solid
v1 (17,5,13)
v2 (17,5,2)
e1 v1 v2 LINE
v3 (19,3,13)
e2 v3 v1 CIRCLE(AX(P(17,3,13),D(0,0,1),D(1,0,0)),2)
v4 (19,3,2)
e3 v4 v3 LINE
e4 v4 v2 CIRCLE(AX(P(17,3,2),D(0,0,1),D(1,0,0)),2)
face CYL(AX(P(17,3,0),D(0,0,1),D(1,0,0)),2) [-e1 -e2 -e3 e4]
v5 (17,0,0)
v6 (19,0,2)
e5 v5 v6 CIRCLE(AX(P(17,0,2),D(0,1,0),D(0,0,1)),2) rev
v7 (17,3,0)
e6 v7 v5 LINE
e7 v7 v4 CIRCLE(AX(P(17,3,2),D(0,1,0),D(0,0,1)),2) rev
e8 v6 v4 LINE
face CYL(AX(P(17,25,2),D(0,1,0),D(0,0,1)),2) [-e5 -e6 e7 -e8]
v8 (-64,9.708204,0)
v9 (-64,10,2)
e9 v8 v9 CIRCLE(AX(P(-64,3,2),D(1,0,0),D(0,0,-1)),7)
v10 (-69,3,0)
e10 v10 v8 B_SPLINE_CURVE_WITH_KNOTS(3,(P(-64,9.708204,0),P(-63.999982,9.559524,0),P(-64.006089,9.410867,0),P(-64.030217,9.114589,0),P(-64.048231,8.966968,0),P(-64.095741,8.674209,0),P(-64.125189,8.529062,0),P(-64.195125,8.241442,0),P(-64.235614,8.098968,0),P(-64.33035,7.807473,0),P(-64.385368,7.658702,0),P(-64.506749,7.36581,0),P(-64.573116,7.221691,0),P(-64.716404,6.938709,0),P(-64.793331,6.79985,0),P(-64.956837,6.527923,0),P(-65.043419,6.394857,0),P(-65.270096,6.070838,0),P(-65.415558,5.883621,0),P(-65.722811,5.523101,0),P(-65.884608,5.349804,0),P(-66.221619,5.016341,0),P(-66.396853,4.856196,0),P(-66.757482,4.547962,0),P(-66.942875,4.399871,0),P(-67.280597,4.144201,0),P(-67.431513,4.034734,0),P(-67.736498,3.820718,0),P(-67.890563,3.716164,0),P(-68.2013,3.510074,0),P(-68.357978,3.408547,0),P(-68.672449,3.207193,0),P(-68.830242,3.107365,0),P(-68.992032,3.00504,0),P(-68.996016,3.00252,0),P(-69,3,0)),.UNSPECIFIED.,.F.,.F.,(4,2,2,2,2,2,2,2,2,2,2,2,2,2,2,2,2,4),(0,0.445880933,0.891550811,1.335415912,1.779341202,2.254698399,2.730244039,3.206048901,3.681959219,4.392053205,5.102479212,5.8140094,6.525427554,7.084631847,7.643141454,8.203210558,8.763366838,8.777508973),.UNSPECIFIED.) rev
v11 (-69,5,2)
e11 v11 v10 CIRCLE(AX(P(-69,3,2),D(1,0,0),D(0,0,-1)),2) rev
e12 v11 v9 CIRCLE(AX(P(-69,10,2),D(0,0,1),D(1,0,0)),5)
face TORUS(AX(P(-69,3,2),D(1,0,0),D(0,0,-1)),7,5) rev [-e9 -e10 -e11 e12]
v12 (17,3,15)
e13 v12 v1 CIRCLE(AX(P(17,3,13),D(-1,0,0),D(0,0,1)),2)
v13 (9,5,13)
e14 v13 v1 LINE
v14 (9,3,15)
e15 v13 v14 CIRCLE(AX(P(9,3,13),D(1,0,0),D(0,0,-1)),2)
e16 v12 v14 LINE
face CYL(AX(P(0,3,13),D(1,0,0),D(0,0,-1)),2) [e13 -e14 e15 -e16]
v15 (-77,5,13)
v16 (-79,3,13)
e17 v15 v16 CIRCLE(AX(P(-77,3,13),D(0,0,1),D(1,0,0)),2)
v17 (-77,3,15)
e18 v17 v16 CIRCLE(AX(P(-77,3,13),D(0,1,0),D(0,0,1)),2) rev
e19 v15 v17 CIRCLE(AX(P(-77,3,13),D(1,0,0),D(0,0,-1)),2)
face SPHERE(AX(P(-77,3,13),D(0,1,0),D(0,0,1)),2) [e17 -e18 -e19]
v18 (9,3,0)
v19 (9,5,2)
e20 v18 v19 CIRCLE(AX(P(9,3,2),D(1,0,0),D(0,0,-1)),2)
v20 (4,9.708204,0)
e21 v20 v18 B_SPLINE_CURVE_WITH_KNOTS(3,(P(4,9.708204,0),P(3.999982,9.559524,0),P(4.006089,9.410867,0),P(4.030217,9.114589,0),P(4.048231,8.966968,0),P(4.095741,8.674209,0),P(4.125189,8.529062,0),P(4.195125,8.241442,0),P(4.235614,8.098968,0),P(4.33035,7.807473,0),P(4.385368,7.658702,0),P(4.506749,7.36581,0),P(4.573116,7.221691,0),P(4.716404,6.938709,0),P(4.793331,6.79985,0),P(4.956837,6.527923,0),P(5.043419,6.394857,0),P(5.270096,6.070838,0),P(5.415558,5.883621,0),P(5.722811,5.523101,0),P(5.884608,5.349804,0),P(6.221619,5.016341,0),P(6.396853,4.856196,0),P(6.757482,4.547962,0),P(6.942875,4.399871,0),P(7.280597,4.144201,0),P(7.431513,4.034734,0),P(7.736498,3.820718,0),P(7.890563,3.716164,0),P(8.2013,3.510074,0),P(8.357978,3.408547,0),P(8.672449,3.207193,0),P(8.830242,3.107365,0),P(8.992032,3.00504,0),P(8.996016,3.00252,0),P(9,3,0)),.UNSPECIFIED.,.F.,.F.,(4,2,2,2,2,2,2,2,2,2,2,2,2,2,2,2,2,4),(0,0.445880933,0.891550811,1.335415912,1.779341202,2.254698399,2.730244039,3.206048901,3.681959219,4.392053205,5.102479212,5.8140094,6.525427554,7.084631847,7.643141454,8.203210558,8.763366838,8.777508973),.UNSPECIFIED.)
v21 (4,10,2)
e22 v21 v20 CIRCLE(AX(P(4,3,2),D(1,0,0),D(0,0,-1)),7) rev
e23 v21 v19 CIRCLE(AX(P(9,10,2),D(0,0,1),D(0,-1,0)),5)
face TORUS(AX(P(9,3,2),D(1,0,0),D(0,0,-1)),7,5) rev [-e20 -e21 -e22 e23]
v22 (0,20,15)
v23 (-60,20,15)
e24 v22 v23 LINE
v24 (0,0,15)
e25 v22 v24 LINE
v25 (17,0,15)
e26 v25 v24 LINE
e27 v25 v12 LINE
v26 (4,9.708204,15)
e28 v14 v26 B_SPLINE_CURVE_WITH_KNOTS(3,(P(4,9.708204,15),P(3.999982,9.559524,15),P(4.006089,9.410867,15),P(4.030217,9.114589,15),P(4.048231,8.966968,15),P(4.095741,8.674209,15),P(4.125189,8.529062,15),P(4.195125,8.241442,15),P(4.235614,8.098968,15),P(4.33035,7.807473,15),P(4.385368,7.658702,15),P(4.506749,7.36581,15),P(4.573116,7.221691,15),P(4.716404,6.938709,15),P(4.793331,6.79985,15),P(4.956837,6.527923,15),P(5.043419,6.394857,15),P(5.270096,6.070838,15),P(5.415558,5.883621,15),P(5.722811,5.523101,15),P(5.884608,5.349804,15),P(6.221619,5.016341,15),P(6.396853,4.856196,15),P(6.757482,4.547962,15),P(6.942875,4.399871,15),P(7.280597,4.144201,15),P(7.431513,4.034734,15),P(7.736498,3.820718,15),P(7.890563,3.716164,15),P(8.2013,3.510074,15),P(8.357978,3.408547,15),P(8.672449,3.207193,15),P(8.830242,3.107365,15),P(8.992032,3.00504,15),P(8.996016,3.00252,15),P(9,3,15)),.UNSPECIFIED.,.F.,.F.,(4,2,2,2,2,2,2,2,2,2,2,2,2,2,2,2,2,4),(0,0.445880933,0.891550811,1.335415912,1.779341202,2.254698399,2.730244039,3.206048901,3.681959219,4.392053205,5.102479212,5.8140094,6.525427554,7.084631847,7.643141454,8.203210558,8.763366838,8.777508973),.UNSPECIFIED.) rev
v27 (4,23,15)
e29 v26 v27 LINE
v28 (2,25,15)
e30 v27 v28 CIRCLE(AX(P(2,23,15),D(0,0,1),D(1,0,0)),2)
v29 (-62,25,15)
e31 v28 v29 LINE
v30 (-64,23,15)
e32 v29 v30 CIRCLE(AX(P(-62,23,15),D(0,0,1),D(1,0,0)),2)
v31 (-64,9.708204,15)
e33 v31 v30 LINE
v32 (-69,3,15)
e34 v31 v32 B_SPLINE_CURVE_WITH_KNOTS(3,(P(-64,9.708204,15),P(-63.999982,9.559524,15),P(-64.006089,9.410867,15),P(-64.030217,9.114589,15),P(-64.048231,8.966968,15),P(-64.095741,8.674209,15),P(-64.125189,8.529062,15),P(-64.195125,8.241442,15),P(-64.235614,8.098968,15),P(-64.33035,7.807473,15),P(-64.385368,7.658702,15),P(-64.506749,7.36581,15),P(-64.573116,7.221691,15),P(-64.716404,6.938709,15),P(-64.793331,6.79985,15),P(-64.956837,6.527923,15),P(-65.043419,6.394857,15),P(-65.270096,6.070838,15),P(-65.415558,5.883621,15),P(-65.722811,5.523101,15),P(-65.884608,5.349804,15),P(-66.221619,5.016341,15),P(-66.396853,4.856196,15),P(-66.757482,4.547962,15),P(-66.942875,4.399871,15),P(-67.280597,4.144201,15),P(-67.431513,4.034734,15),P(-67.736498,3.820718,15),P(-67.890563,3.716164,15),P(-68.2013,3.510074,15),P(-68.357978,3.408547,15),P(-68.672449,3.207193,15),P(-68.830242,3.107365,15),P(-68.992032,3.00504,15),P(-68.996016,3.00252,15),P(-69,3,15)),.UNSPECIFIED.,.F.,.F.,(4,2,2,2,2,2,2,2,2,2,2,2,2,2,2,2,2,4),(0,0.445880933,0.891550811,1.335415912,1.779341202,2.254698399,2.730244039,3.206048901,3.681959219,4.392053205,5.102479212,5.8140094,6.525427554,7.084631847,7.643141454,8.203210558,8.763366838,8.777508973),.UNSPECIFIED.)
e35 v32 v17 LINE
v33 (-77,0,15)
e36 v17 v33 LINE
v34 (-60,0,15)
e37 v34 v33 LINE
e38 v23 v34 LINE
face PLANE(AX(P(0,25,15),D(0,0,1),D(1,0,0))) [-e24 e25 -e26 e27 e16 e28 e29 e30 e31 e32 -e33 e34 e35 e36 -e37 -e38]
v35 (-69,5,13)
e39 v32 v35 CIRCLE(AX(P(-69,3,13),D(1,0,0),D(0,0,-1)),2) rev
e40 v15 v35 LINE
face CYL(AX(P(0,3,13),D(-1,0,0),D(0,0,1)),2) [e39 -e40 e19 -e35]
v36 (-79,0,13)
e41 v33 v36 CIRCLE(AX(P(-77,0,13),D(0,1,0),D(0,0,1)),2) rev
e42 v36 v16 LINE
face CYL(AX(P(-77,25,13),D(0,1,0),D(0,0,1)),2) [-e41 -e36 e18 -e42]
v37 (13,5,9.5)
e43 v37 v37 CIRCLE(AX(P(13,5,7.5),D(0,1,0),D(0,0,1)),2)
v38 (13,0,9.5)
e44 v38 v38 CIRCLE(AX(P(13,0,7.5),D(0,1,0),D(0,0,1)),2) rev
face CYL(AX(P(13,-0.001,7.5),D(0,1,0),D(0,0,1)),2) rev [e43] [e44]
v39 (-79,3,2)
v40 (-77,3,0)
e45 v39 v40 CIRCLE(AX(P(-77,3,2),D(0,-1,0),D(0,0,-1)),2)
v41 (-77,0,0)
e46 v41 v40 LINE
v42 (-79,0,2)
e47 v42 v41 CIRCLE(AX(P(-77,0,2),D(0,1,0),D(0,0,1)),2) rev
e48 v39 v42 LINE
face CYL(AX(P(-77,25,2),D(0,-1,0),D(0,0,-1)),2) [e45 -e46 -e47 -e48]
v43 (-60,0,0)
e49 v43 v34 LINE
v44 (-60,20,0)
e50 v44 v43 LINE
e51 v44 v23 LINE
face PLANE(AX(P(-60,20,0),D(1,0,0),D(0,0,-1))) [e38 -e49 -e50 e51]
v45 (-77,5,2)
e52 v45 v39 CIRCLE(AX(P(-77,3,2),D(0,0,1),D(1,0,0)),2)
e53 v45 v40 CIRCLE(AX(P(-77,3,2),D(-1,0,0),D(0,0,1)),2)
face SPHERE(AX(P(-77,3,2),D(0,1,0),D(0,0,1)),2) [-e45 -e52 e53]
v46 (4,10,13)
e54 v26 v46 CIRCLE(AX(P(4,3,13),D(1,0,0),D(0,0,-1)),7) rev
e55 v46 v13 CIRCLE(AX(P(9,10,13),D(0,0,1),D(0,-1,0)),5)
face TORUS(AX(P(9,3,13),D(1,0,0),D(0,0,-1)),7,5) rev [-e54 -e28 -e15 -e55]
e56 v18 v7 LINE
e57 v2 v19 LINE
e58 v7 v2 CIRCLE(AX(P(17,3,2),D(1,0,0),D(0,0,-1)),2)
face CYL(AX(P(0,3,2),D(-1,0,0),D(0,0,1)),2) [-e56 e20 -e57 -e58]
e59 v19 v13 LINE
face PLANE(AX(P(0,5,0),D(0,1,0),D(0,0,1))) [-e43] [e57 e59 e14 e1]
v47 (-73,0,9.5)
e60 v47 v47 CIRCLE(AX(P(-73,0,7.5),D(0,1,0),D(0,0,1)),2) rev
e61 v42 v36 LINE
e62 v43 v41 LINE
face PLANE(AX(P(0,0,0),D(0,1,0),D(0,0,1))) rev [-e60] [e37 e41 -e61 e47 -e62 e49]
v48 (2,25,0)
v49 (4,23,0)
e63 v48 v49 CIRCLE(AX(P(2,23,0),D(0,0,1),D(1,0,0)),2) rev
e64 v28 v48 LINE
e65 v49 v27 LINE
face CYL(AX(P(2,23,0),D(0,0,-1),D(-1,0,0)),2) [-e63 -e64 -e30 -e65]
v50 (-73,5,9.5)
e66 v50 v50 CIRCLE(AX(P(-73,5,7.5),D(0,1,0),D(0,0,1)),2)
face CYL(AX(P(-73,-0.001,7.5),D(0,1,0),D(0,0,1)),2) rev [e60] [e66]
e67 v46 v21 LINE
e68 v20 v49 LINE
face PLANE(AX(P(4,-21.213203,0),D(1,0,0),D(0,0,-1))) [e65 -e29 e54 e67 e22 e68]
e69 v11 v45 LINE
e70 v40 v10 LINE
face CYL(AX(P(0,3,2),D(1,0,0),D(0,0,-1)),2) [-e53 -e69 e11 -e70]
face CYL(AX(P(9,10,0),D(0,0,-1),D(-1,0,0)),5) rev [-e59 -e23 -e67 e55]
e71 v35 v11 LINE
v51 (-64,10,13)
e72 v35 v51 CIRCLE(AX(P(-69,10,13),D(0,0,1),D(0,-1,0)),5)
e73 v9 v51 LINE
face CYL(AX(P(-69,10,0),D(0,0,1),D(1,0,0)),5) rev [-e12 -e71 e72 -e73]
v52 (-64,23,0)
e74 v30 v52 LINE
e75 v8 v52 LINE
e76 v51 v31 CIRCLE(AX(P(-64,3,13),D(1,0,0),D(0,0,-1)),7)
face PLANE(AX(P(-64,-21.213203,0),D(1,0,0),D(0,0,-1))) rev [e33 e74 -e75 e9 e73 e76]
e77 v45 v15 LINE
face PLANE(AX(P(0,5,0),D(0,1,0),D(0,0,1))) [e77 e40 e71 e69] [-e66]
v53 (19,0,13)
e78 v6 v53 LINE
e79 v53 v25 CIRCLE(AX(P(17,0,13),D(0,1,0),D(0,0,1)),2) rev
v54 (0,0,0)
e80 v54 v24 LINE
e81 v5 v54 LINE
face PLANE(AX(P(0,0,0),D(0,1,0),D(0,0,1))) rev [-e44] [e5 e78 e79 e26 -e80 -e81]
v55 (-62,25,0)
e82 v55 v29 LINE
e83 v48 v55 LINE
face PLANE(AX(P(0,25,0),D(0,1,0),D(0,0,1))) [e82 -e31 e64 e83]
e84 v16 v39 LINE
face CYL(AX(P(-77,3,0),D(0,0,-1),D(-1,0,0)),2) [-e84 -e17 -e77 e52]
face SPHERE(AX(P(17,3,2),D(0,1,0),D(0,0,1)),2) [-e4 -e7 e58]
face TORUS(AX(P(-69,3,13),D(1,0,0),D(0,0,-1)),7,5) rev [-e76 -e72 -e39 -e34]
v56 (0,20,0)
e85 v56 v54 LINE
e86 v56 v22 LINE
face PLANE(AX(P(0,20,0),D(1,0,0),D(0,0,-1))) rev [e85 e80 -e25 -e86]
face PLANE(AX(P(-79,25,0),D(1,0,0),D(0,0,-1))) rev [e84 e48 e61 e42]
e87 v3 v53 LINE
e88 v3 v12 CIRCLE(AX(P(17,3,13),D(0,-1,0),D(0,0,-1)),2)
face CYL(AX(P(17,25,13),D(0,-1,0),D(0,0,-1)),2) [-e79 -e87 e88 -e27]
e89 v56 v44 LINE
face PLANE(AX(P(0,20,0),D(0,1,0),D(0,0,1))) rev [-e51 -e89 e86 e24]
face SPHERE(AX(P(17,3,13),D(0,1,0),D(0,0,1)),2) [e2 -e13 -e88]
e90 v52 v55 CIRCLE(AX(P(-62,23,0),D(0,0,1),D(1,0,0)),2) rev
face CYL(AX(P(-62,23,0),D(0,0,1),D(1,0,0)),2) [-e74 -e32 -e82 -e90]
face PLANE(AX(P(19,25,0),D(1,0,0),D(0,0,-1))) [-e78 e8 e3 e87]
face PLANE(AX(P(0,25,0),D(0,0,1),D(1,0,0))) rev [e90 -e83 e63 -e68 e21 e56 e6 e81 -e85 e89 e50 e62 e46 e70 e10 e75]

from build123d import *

# Parameters (mm, degrees)
SKETCH1_W           = 15
SKETCH1_H           = 15
SKETCH1_W_2         = 4
SKETCH1_W_3         = 60
BOSS_EXTRUDE1_DEPTH = 25
SKETCH1_3_W         = 60
SKETCH1_3_H         = 15
CUT_EXTRUDE1_DEPTH  = 20
CUT_EXTRUDE2_START  = 25
SKETCH1_4_W         = 15
SKETCH1_4_H         = 15
CUT_EXTRUDE2_DEPTH  = 20
FILLET1_R           = 2
FILLET2_R           = 2
FILLET3_R           = 5
CUT_EXTRUDE3_REACH  = 84.861
SKETCH2_R           = 2


with BuildPart() as part:
    # Sketch1 → Boss-Extrude1 (new body)
    with BuildSketch(Plane(origin=(0, 0, 0), x_dir=(1, 0, 0), z_dir=(0, 1, 0))):
        with Locations((-71.5, -7.5)):
            Rectangle(SKETCH1_W, SKETCH1_H)
        with Locations((-62, -7.5)):
            Rectangle(SKETCH1_W_2, SKETCH1_H)
        with Locations((-30, -7.5)):
            Rectangle(SKETCH1_W_3, SKETCH1_H)
        with Locations((2, -7.5)):
            Rectangle(SKETCH1_W_2, SKETCH1_H)
        with Locations((11.5, -7.5)):
            Rectangle(SKETCH1_W, SKETCH1_H)
    extrude(amount=BOSS_EXTRUDE1_DEPTH)

    # Sketch1<3> → Cut-Extrude1 (cut)
    with BuildSketch(Plane(origin=(0, 0, 0), x_dir=(1, 0, 0), z_dir=(0, 1, 0))):
        with Locations((-30, -7.5)):
            Rectangle(SKETCH1_3_W, SKETCH1_3_H)
    extrude(amount=CUT_EXTRUDE1_DEPTH, mode=Mode.SUBTRACT)

    # Sketch1<4> → Cut-Extrude2 (cut)
    with BuildSketch(Plane(origin=(0, 0, 0), x_dir=(1, 0, 0), z_dir=(0, 1, 0)).offset(CUT_EXTRUDE2_START)):
        with Locations((-71.5, -7.5)):
            Rectangle(SKETCH1_4_W, SKETCH1_4_H)
        with Locations((11.5, -7.5)):
            Rectangle(SKETCH1_4_W, SKETCH1_4_H)
    extrude(amount=-CUT_EXTRUDE2_DEPTH, mode=Mode.SUBTRACT)

    # Fillet1
    fillet1_edges = [part.edges().sort_by_distance(p)[0] for p in [
        (19, 2.5, 0),
        (19, 2.5, 15),
        (-79, 2.5, 15),
        (-79, 2.5, 0),
        (-64, 25, 7.5),
        (4, 25, 7.5),
    ]]
    fillet(fillet1_edges, radius=FILLET1_R)

    # Fillet2
    fillet2_edges = [part.edges().sort_by_distance(p)[0] for p in [
        (-70.5, 5, 0),
        (-70.5, 5, 15),
        (10.5, 5, 15),
        (10.5, 5, 0),
        (19, 5, 7.5),
        (18.414213562, 5, 14.414213562),
        (18.414213562, 5, 0.585786438),
        (-79, 5, 7.5),
        (-78.414213562, 5, 14.414213562),
        (-78.414213562, 5, 0.585786438),
    ]]
    fillet(fillet2_edges, radius=FILLET2_R)

    # Fillet3
    # the kernel refuses this fillet: 5 mm, written as the material it adds along each edge
    with BuildSketch(Plane(origin=(-64, 5, 13), x_dir=(-1, 0, 0), z_dir=(0, 0, -1))) as fillet3_piece_1:
        with BuildLine():
            CenterArc((FILLET3_R, FILLET3_R), FILLET3_R, 180, 90)
            Line((0, FILLET3_R), (0, 0))
            Line((0, 0), (FILLET3_R, 0))
        make_face()
    extrude(amount=11)
    with BuildSketch(Plane(origin=(4, 5, 13), x_dir=(1, 0, 0), z_dir=(0, 0, -1))) as fillet3_piece_2:
        with BuildLine():
            CenterArc((FILLET3_R, -FILLET3_R), FILLET3_R, 90, 90)
            Line((0, -FILLET3_R), (0, 0))
            Line((0, 0), (FILLET3_R, 0))
        make_face()
    extrude(amount=11)
    with BuildSketch(Plane(origin=(-64, 3, 13), x_dir=(0, 0.9999802608561372, -0.00628314396555929), z_dir=(0, 0.00628314396555929, 0.9999802608561372))) as fillet3_piece_3_section:
        with BuildLine():
            CenterArc((-2 - FILLET3_R, FILLET3_R), FILLET3_R, 270, 90)
            Line((-2 - FILLET3_R, 0), (-2, 0))
            Line((-2, 0), (-2, FILLET3_R))
        make_face()
    fillet3_piece_3 = revolve(axis=Axis((-64, 3, 13), (-1, 0, 0)), revolution_arc=359.64, mode=Mode.PRIVATE)
    fillet3_piece_3 = split(fillet3_piece_3, bisect_by=Plane(origin=(-65.84257052, 4.524977571, 15), z_dir=(0, 0, -1)), keep=Keep.TOP, mode=Mode.PRIVATE)
    fillet3_piece_3 = split(fillet3_piece_3, bisect_by=Plane(origin=(-65.84257052, 0, 14.524977571), z_dir=(0, 1, 0)), keep=Keep.TOP, mode=Mode.PRIVATE)
    add(fillet3_piece_3)
    with BuildSketch(Plane(origin=(4, 3, 13), x_dir=(0, 1, 0), z_dir=(0, 0, -1))) as fillet3_piece_4_section:
        with BuildLine():
            CenterArc((2 + FILLET3_R, FILLET3_R), FILLET3_R, 180, 90)
            Line((2 + FILLET3_R, 0), (2, 0))
            Line((2, 0), (2, FILLET3_R))
        make_face()
    fillet3_piece_4 = revolve(axis=Axis((4, 3, 13), (1, 0, 0)), revolution_arc=359.64, mode=Mode.PRIVATE)
    fillet3_piece_4 = split(fillet3_piece_4, bisect_by=Plane(origin=(5.842570594, 4.524977559, 15), z_dir=(0, 0, -1)), keep=Keep.TOP, mode=Mode.PRIVATE)
    fillet3_piece_4 = split(fillet3_piece_4, bisect_by=Plane(origin=(5.842570594, 0, 14.524977563), z_dir=(0, 1, 0)), keep=Keep.TOP, mode=Mode.PRIVATE)
    add(fillet3_piece_4)
    with BuildSketch(Plane(origin=(-64, 3, 2), x_dir=(0, 0.9999802608561372, 0.006283143965558735), z_dir=(0, 0.006283143965558735, -0.9999802608561372))) as fillet3_piece_5_section:
        with BuildLine():
            CenterArc((-2 - FILLET3_R, -FILLET3_R), FILLET3_R, 0, 90)
            Line((-2 - FILLET3_R, 0), (-2, 0))
            Line((-2, 0), (-2, -FILLET3_R))
        make_face()
    fillet3_piece_5 = revolve(axis=Axis((-64, 3, 2), (1, 0, 0)), revolution_arc=359.64, mode=Mode.PRIVATE)
    fillet3_piece_5 = split(fillet3_piece_5, bisect_by=Plane(origin=(-65.842570484, 4.524977652, 0), z_dir=(0, 0, 1)), keep=Keep.TOP, mode=Mode.PRIVATE)
    fillet3_piece_5 = split(fillet3_piece_5, bisect_by=Plane(origin=(-65.842570484, 0, 0.47502245), z_dir=(0, 1, 0)), keep=Keep.TOP, mode=Mode.PRIVATE)
    add(fillet3_piece_5)
    with BuildSketch(Plane(origin=(4, 3, 2), x_dir=(0, 1, 0), z_dir=(0, 0, 1))) as fillet3_piece_6_section:
        with BuildLine():
            CenterArc((2 + FILLET3_R, -FILLET3_R), FILLET3_R, 90, 90)
            Line((2, -FILLET3_R), (2, 0))
            Line((2, 0), (2 + FILLET3_R, 0))
        make_face()
    fillet3_piece_6 = revolve(axis=Axis((4, 3, 2), (-1, 0, 0)), revolution_arc=359.64, mode=Mode.PRIVATE)
    fillet3_piece_6 = split(fillet3_piece_6, bisect_by=Plane(origin=(4.944030812, 6.137069115, 0), z_dir=(0, 0, 1)), keep=Keep.TOP, mode=Mode.PRIVATE)
    fillet3_piece_6 = split(fillet3_piece_6, bisect_by=Plane(origin=(4.944030812, 0, 1.077199574), z_dir=(0, 1, 0)), keep=Keep.TOP, mode=Mode.PRIVATE)
    add(fillet3_piece_6)

    # Sketch2 → Cut-Extrude3 (cut, up to next)
    with BuildSketch(Plane(origin=(0, 5, 0), x_dir=(1, 0, 0), z_dir=(0, 1, 0)), mode=Mode.PRIVATE) as cut_extrude3_sk1:
        with Locations(Location((13, -7.5, 0), (0, 0, 270))):
            Circle(SKETCH2_R)
    cut_extrude3_tool1 = extrude(cut_extrude3_sk1.sketch, amount=-CUT_EXTRUDE3_REACH, mode=Mode.PRIVATE) & part.part
    # Sketch2 → Cut-Extrude3 (cut, up to next)
    with BuildSketch(Plane(origin=(0, 5, 0), x_dir=(1, 0, 0), z_dir=(0, 1, 0)), mode=Mode.PRIVATE) as cut_extrude3_sk2:
        with Locations(Location((-73, -7.5, 0), (0, 0, 270))):
            Circle(SKETCH2_R)
    cut_extrude3_tool2 = extrude(cut_extrude3_sk2.sketch, amount=-CUT_EXTRUDE3_REACH, mode=Mode.PRIVATE) & part.part
    add(cut_extrude3_tool1.solids().sort_by_distance((13, 5, 7.5))[0], mode=Mode.SUBTRACT)
    add(cut_extrude3_tool2.solids().sort_by_distance((-73, 5, 7.5))[0], mode=Mode.SUBTRACT)


solid = part.part
